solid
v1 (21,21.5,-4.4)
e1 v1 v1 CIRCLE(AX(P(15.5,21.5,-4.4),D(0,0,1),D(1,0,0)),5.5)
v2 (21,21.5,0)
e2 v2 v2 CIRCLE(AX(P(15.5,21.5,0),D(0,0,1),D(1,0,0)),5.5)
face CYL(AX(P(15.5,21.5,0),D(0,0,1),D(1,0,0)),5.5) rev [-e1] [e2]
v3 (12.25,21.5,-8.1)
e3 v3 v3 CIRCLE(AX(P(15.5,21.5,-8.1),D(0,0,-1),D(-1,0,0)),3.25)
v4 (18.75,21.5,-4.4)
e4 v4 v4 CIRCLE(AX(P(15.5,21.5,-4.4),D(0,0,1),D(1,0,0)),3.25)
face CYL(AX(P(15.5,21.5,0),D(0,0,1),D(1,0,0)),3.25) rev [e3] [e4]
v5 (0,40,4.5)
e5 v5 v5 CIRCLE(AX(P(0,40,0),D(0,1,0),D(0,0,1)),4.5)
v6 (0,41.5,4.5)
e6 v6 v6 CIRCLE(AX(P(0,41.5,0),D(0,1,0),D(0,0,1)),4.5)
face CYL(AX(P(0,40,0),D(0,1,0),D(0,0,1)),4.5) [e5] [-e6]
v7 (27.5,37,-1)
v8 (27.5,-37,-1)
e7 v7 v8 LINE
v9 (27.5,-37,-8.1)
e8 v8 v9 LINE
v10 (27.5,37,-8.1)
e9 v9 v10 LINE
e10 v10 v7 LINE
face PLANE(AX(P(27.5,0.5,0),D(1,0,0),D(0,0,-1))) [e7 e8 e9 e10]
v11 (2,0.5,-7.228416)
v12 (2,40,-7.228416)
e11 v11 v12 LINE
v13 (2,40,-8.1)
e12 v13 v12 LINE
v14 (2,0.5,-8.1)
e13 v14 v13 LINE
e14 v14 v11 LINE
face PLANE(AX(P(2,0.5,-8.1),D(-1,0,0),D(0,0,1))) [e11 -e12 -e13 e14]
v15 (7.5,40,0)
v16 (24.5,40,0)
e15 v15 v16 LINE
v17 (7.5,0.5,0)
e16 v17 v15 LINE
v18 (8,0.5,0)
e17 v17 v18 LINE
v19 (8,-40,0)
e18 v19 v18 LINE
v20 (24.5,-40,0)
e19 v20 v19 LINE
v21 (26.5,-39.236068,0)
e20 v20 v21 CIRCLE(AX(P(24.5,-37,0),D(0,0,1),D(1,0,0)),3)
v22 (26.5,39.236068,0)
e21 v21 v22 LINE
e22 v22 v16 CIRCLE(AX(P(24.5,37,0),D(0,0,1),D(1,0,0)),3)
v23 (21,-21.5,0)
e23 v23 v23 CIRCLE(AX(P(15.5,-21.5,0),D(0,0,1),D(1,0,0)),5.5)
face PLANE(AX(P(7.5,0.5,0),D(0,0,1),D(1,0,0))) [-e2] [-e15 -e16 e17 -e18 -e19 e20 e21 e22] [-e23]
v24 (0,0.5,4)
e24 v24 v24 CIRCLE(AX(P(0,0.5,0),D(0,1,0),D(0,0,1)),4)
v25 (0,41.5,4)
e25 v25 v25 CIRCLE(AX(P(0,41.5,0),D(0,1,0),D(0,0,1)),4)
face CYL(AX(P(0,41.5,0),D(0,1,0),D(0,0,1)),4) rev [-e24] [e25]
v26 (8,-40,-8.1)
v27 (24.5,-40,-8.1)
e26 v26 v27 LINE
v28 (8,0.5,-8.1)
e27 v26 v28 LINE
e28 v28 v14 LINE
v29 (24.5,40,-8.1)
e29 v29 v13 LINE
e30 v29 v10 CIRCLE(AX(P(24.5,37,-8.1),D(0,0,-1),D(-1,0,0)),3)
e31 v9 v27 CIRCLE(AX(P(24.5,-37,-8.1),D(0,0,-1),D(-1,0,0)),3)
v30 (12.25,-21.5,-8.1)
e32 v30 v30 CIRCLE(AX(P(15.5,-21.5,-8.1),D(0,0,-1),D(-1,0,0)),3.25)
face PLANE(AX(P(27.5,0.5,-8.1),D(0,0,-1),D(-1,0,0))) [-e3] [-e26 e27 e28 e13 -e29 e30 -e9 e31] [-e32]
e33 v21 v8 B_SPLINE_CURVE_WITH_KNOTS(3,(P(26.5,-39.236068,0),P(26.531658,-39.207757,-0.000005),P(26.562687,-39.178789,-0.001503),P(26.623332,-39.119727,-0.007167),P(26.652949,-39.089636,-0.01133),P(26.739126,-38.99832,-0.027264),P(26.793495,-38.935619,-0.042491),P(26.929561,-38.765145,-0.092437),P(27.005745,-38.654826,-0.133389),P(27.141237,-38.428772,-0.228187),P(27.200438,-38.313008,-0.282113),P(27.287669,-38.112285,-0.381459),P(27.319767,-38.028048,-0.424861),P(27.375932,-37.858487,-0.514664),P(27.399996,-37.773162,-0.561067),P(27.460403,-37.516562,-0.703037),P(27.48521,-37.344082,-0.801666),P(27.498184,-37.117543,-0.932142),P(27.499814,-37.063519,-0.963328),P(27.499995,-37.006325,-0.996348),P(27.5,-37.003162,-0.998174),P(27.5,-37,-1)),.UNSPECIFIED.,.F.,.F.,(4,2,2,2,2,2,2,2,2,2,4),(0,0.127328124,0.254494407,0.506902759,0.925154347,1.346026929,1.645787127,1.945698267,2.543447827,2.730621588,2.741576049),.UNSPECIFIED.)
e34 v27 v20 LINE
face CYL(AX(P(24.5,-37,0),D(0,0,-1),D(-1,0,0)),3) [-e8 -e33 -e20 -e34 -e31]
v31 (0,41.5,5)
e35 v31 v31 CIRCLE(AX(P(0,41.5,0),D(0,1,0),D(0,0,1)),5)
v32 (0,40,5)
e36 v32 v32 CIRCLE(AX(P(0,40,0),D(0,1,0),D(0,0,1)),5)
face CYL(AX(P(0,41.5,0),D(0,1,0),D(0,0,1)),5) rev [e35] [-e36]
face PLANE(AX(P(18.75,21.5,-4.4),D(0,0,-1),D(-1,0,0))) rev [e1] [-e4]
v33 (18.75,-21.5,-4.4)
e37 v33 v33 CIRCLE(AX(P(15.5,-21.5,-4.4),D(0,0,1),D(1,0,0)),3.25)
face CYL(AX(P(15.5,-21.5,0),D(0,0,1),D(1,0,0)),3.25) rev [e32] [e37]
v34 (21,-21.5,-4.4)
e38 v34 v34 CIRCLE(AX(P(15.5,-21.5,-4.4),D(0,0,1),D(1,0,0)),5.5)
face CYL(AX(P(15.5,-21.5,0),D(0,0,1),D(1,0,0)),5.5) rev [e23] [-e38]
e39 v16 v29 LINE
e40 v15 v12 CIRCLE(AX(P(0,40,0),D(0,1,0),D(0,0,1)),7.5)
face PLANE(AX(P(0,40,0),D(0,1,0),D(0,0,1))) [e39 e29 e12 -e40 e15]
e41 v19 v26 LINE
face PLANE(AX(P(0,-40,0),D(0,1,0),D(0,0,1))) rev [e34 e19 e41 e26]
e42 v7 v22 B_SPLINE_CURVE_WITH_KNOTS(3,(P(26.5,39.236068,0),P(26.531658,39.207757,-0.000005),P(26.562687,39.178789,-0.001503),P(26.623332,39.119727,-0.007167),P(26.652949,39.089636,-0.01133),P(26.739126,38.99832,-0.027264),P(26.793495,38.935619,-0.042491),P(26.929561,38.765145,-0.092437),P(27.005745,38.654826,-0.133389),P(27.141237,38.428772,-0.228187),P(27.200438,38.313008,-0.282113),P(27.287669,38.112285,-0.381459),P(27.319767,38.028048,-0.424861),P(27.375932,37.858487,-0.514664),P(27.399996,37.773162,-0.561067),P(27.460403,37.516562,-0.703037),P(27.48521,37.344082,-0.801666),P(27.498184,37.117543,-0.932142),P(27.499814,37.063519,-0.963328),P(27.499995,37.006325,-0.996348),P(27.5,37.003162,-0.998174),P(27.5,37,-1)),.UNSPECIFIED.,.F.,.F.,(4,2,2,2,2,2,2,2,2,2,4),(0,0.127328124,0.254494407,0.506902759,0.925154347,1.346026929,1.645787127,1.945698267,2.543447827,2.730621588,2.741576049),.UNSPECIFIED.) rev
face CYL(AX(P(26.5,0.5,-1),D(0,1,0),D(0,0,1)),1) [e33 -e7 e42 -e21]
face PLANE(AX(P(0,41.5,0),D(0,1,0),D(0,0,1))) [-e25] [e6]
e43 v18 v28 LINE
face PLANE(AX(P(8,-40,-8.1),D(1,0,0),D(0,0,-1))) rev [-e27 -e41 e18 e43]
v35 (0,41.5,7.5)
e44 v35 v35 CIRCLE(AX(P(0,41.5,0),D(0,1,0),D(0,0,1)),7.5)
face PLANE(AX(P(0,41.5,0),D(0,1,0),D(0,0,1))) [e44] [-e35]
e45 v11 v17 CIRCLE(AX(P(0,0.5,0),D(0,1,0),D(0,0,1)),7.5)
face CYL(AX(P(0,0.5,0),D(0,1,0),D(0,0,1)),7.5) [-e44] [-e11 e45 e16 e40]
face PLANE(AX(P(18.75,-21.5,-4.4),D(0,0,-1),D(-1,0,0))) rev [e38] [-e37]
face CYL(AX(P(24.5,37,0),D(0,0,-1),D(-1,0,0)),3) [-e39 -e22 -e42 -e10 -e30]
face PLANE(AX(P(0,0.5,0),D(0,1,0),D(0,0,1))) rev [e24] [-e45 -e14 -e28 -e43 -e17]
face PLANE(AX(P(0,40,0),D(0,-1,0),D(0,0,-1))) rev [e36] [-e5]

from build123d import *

# Parameters (mm, degrees)
EXTRUDE1_DEPTH       = 39.5
SKETCH2_W            = 19.5
SKETCH2_H            = 8.1
EXTRUDE2_DEPTH       = 40.5
EXTRUDE3_START       = 1.5
SKETCH3_R            = 7.5
EXTRUDE3_DEPTH       = 1.5
HOLEWZD1_D           = 10
HOLEWZD1_DEPTH       = 1.5
SKETCH6_W            = 4.5
SKETCH6_H            = 1.5
HOLEWZD2_D           = 8
HOLEWZD2_DEPTH       = 81.500025
HOLEWZD3_D           = 6.5
HOLEWZD3_CBORE_D     = 11
HOLEWZD3_CBORE_DEPTH = 4.4
FILLET1_R            = 1
FILLET2_R            = 3


with BuildPart() as part:
    # Sketch1 → Extrude1 (new body)
    with BuildSketch(Plane(origin=(0, 40, 0), x_dir=(1, 0, 0), z_dir=(0, 1, 0))):
        with BuildLine():
            Line((27.5, 8.1), (2, 8.1))
            Line((2, 8.1), (2, 7.228416147))
            ThreePointArc((2, 7.228416147), (-5.968668193, -4.541475531), (7.5, 0))
            Line((7.5, 0), (27.5, 0))
            Line((27.5, 0), (27.5, 8.1))
        make_face()
    extrude(amount=-EXTRUDE1_DEPTH)

    # Sketch2 → Extrude2 (add)
    with BuildSketch(Plane.XZ.offset(-0.5)):
        with Locations((17.75, -4.05)):
            Rectangle(SKETCH2_W, SKETCH2_H)
    extrude(amount=EXTRUDE2_DEPTH)

    # Sketch3 → Extrude3 (add)
    with BuildSketch(Plane(origin=(0, 40, 0), x_dir=(-1, 0, 0), z_dir=(0, 1, 0)).offset(EXTRUDE3_START)):
        with Locations(Location((0, 0, 0), (0, 0, 90))):
            Circle(SKETCH3_R)
    extrude(amount=-EXTRUDE3_DEPTH)

    # HoleWzd1
    with Locations(Plane(origin=(0, 41.5, 0), x_dir=(1, 0, 0), z_dir=(0, 1, 0))):
        with Locations((0, 0)):
            Hole(HOLEWZD1_D / 2, depth=HOLEWZD1_DEPTH)

    # Sketch6 → Revolve1 (revolve)
    with BuildSketch(Plane(origin=(0, 0, 0), x_dir=(-1, 0, 0), z_dir=(0, 0, -1)), mode=Mode.PRIVATE) as revolve1_sk:
        with Locations((-2.25, 40.75)):
            Rectangle(SKETCH6_W, SKETCH6_H)
    revolve(revolve1_sk.sketch.rotate(Axis((0, 40, 0), (0, 1, 0)), 270), axis=Axis((0, 40, 0), (0, 1, 0)))

    # HoleWzd2
    with Locations(Plane(origin=(0, 41.5, 0), x_dir=(1, 0, 0), z_dir=(0, 1, 0))):
        with Locations((0, 0)):
            Hole(HOLEWZD2_D / 2, depth=HOLEWZD2_DEPTH)

    # HoleWzd3 (through all)
    with Locations(Plane.XY):
        with Locations((15.5, 21.5), (15.5, -21.5)):
            CounterBoreHole(HOLEWZD3_D / 2, HOLEWZD3_CBORE_D / 2, HOLEWZD3_CBORE_DEPTH)

    # Fillet1
    fillet1_edges = [part.edges().sort_by_distance(p)[0] for p in [
        (27.5, 0, 0),
    ]]
    fillet(fillet1_edges, radius=FILLET1_R)

    # Fillet2
    # the kernel refuses this fillet: 3 mm, written as the material it takes off along each edge
    with BuildSketch(Plane(origin=(27.5, 40, 6.5), x_dir=(-1, 0, 0), z_dir=(0, 0, -1))) as fillet2_piece_1:
        with BuildLine():
            CenterArc((FILLET2_R, -FILLET2_R), FILLET2_R, 90, 90)
            Line((0, -FILLET2_R), (0, 0))
            Line((0, 0), (FILLET2_R, 0))
        make_face()
    extrude(amount=22.1, mode=Mode.SUBTRACT)
    with BuildSketch(Plane(origin=(27.5, -40, 6.5), x_dir=(-1, 0, 0), z_dir=(0, 0, -1))) as fillet2_piece_2:
        with BuildLine():
            CenterArc((FILLET2_R, FILLET2_R), FILLET2_R, 180, 90)
            Line((0, FILLET2_R), (0, 0))
            Line((0, 0), (FILLET2_R, 0))
        make_face()
    extrude(amount=22.1, mode=Mode.SUBTRACT)


solid = part.part
